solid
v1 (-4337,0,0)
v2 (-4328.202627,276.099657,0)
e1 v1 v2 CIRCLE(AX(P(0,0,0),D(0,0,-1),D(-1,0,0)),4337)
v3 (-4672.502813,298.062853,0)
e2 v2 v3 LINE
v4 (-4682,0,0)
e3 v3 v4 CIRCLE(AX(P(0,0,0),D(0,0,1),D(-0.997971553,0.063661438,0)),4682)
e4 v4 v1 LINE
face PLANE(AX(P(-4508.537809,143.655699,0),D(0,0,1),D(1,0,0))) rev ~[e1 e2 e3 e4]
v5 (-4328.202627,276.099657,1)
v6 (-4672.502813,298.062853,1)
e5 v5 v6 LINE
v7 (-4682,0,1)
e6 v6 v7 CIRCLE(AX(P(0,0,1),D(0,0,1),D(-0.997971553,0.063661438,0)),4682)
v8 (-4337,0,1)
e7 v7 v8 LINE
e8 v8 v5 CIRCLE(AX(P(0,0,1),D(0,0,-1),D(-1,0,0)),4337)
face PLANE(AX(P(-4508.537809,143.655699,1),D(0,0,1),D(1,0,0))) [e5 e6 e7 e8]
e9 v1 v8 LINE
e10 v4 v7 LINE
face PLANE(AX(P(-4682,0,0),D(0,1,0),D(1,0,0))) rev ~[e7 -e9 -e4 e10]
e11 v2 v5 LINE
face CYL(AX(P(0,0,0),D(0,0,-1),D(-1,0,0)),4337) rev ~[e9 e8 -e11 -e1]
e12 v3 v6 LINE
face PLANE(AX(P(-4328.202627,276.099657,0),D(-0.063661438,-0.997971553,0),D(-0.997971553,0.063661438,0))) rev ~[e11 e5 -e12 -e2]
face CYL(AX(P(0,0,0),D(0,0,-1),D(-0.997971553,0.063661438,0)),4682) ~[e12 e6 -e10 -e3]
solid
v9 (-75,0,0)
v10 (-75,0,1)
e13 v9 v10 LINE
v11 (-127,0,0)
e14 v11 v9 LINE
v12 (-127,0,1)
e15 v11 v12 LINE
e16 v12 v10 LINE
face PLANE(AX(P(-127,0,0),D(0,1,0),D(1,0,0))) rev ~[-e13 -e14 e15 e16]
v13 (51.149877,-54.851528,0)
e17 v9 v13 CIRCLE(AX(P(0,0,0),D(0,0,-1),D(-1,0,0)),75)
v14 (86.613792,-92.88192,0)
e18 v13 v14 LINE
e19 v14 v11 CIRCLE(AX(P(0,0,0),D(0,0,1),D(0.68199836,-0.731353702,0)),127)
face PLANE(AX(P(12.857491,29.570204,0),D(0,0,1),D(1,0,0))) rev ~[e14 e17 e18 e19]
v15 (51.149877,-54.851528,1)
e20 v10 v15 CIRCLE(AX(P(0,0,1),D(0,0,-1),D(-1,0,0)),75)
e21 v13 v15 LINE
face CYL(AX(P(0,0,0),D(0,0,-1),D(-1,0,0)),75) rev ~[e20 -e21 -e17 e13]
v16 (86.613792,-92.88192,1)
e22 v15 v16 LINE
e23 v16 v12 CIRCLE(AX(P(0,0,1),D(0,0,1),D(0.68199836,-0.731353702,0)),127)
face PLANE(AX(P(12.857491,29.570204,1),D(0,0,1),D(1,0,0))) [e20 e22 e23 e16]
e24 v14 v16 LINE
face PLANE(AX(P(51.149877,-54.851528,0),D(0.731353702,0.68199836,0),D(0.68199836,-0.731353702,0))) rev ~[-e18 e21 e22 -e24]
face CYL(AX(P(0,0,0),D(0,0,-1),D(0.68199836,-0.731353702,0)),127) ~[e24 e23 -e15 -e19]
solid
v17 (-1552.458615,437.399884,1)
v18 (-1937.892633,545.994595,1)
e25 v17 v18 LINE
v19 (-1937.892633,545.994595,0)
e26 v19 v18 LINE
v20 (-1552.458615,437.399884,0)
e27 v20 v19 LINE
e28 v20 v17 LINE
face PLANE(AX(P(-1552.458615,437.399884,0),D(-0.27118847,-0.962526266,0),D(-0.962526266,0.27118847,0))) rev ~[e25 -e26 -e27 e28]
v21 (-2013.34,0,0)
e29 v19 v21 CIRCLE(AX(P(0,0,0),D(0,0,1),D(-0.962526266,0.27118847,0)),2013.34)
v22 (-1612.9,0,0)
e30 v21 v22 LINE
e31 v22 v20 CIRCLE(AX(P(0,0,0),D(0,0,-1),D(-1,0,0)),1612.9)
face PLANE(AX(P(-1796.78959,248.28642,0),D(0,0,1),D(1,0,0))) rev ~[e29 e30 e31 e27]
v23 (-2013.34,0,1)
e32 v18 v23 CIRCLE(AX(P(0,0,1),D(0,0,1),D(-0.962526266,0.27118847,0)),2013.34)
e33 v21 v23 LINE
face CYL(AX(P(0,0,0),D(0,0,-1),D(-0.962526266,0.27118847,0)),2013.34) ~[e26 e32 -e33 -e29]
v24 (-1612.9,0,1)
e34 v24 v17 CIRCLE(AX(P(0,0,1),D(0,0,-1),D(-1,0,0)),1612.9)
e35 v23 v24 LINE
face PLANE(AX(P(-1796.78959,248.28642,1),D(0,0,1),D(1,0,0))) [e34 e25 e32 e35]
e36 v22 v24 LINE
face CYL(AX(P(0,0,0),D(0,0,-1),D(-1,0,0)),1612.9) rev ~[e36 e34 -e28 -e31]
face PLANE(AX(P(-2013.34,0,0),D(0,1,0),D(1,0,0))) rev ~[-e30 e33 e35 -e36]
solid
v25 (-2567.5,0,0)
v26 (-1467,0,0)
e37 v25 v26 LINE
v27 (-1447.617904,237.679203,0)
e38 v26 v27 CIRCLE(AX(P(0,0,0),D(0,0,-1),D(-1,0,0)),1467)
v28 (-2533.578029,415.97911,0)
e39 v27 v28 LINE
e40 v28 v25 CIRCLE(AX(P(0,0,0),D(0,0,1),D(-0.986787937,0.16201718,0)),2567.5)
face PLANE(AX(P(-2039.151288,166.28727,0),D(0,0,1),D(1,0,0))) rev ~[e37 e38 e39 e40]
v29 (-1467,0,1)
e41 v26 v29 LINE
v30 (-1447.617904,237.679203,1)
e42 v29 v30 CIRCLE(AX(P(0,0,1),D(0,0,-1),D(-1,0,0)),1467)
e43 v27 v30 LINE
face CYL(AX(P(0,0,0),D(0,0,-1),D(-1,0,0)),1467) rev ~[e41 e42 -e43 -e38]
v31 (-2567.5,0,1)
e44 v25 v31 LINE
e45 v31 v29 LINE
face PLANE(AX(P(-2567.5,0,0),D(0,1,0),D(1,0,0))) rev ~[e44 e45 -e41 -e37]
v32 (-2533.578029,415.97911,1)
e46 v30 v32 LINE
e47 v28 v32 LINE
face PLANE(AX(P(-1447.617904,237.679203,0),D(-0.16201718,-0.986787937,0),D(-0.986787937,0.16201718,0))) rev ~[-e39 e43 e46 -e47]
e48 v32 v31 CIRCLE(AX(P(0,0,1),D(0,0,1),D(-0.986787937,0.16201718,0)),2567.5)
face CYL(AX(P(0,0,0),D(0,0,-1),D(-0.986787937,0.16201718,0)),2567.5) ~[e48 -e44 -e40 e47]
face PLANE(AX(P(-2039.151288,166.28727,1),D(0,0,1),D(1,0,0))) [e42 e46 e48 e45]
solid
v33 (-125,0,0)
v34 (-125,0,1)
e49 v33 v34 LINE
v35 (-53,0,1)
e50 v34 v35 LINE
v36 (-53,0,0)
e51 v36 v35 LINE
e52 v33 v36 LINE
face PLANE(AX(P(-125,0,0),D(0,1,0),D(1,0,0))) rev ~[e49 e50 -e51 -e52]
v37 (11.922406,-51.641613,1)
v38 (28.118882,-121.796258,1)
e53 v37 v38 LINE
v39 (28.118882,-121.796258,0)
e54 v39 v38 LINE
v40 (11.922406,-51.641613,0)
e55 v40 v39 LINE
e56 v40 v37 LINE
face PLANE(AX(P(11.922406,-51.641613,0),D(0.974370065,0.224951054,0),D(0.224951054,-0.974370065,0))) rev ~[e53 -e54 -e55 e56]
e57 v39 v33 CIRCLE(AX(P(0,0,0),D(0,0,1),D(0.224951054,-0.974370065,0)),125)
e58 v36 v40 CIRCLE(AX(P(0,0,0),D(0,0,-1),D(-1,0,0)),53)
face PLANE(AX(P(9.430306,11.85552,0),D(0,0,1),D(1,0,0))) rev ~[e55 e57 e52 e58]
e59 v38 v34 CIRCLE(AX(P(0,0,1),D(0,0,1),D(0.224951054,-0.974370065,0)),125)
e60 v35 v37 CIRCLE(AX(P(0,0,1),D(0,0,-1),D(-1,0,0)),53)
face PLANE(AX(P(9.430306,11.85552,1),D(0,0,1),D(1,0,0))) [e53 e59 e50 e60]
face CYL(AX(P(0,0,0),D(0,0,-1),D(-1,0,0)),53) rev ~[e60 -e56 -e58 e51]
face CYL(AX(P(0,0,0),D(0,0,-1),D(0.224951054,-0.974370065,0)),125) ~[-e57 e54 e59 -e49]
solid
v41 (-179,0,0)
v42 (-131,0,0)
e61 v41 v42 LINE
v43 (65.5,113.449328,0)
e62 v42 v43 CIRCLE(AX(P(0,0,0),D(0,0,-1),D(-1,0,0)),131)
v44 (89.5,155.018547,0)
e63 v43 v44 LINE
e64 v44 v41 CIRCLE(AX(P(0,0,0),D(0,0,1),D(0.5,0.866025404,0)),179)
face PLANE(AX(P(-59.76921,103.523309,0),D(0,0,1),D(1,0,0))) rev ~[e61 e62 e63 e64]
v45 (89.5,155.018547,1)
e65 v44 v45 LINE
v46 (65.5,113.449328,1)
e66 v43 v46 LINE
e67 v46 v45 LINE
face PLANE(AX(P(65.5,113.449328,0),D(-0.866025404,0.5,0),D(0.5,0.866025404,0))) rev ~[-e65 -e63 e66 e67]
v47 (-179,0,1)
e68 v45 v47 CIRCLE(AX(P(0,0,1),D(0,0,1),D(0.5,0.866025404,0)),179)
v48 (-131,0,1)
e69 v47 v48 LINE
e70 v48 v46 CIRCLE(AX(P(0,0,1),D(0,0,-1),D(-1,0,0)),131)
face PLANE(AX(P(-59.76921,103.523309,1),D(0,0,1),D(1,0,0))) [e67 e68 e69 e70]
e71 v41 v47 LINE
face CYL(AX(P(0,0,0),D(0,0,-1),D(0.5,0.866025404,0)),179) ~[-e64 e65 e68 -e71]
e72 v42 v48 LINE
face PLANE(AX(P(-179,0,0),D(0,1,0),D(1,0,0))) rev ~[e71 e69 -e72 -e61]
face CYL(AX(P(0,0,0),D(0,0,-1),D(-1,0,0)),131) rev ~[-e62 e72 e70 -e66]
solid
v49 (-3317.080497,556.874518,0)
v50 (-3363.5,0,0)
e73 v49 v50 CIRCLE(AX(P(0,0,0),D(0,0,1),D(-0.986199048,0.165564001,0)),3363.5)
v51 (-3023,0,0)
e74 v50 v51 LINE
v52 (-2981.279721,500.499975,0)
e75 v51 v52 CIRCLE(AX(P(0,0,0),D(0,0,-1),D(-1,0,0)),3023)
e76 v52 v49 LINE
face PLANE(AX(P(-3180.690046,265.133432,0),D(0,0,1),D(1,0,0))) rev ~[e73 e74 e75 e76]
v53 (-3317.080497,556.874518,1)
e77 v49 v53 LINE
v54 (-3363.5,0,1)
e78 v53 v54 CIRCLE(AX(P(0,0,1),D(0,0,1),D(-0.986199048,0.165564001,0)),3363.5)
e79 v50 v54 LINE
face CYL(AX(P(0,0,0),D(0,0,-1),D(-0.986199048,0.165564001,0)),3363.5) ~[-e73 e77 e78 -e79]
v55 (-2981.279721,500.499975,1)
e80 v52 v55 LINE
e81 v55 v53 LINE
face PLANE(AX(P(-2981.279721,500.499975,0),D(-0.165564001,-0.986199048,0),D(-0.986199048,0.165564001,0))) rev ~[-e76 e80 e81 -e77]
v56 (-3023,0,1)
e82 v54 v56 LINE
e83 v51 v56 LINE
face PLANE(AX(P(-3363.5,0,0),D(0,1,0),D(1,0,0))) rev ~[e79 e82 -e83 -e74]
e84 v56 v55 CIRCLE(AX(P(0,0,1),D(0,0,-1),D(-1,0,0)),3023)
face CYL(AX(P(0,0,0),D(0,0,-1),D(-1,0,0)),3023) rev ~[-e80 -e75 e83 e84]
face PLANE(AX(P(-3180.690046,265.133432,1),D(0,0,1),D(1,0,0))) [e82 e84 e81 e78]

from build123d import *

# Parameters (mm, degrees)
F6_DEPTH = 1
F8_DEPTH = 1


# Not quite as in the source:
# - a feature names something its author has since deleted; it is built from what else it names


with BuildPart() as f6:
    # F0 (on Top) → F6 (new body)
    with BuildSketch(Plane.XY):
        with BuildLine():
            Line((-179, 0), (-131, 0))
            ThreePointArc((-131, 0), (-65.5, 113.4493278958), (65.5, 113.4493278958))
            Line((65.5, 113.4493278958), (89.5, 155.0185472774))
            ThreePointArc((89.5, 155.0185472774), (-89.5, 155.0185472774), (-179, 0))
        make_face()
    extrude(amount=F6_DEPTH)


with BuildPart() as f6b:
    # F2 (on Top) → F6, piece 2 (new body)
    with BuildSketch(Plane.XY):
        with BuildLine():
            Line((-127, 0), (-75, 0))
            ThreePointArc((-75, 0), (29.9061801694, 68.7795055789), (51.1498770047, -54.8515276214))
            Line((51.1498770047, -54.8515276214), (86.6137917279, -92.8819201056))
            ThreePointArc((86.6137917279, -92.8819201056), (50.6411317535, 116.4666294469), (-127, 0))
        make_face()
    extrude(amount=F6_DEPTH)


with BuildPart() as f6c:
    # F4 (on Top) → F6, piece 3 (new body)
    with BuildSketch(Plane.XY):
        with BuildLine():
            Line((-125, 0), (-53, 0))
            ThreePointArc((-53, 0), (32.9932757418, 41.4782323132), (11.9224058802, -51.6416134336))
            Line((11.9224058802, -51.6416134336), (28.118881793, -121.7962580982))
            ThreePointArc((28.118881793, -121.7962580982), (77.8143295797, 97.8260196066), (-125, 0))
        make_face()
    extrude(amount=F6_DEPTH)


with BuildPart() as f6d:
    # F5 (on Top) → F6, piece 4 (new body)
    with BuildSketch(Plane.XY):
        with BuildLine():
            Line((-2567.5, 0), (-1467, 0))
            ThreePointArc((-1467, 0), (-1462.1464470723, 119.2340862083), (-1447.6179041391, 237.6792031622))
            Line((-1447.6179041391, 237.6792031622), (-2533.5780292278, 415.9791098288))
            ThreePointArc((-2533.5780292278, 415.9791098288), (-2559.0054552543, 208.6799702385), (-2567.5, 0))
        make_face()
    extrude(amount=F6_DEPTH)


with BuildPart() as f6e:
    # F3 (on Top) → F6, piece 5 (new body)
    with BuildSketch(Plane.XY):
        with BuildLine():
            Line((-3363.5, 0), (-3023, 0))
            ThreePointArc((-3023, 0), (-3012.5518747764, 251.1179041426), (-2981.2797209521, 500.4999754646))
            Line((-2981.2797209521, 500.4999754646), (-3317.0804966663, 556.8745178548))
            ThreePointArc((-3317.0804966663, 556.8745178548), (-3351.8750350018, 279.4029343644), (-3363.5, 0))
        make_face()
    extrude(amount=F6_DEPTH)


with BuildPart() as f6f:
    # F1 (on Top) → F6, piece 6 (new body)
    with BuildSketch(Plane.XY):
        with BuildLine():
            Line((-4682, 0), (-4337, 0))
            ThreePointArc((-4337, 0), (-4334.80009878, 138.1198885634), (-4328.2026268772, 276.0996571768))
            Line((-4328.2026268772, 276.0996571768), (-4672.5028127828, 298.0628533322))
            ThreePointArc((-4672.5028127828, 298.0628533322), (-4679.6251008734, 149.1070597772), (-4682, 0))
        make_face()
    extrude(amount=F6_DEPTH)


with BuildPart() as f8:
    # F7 (on Top) → F8 (new body)
    with BuildSketch(Plane.XY):
        with BuildLine():
            Line((-2013.34, 0), (-1612.9, 0))
            ThreePointArc((-1612.9, 0), (-1597.718202671, 220.7780669673), (-1552.4586150985, 437.3998838665))
            Line((-1552.4586150985, 437.3998838665), (-1937.8926332212, 545.9945949431))
            ThreePointArc((-1937.8926332212, 545.9945949431), (-1994.3889678006, 275.5913654584), (-2013.34, 0))
        make_face()
    extrude(amount=F8_DEPTH)


solid = Compound([f6.part, f6b.part, f6c.part, f6d.part, f6e.part, f6f.part, f8.part])
